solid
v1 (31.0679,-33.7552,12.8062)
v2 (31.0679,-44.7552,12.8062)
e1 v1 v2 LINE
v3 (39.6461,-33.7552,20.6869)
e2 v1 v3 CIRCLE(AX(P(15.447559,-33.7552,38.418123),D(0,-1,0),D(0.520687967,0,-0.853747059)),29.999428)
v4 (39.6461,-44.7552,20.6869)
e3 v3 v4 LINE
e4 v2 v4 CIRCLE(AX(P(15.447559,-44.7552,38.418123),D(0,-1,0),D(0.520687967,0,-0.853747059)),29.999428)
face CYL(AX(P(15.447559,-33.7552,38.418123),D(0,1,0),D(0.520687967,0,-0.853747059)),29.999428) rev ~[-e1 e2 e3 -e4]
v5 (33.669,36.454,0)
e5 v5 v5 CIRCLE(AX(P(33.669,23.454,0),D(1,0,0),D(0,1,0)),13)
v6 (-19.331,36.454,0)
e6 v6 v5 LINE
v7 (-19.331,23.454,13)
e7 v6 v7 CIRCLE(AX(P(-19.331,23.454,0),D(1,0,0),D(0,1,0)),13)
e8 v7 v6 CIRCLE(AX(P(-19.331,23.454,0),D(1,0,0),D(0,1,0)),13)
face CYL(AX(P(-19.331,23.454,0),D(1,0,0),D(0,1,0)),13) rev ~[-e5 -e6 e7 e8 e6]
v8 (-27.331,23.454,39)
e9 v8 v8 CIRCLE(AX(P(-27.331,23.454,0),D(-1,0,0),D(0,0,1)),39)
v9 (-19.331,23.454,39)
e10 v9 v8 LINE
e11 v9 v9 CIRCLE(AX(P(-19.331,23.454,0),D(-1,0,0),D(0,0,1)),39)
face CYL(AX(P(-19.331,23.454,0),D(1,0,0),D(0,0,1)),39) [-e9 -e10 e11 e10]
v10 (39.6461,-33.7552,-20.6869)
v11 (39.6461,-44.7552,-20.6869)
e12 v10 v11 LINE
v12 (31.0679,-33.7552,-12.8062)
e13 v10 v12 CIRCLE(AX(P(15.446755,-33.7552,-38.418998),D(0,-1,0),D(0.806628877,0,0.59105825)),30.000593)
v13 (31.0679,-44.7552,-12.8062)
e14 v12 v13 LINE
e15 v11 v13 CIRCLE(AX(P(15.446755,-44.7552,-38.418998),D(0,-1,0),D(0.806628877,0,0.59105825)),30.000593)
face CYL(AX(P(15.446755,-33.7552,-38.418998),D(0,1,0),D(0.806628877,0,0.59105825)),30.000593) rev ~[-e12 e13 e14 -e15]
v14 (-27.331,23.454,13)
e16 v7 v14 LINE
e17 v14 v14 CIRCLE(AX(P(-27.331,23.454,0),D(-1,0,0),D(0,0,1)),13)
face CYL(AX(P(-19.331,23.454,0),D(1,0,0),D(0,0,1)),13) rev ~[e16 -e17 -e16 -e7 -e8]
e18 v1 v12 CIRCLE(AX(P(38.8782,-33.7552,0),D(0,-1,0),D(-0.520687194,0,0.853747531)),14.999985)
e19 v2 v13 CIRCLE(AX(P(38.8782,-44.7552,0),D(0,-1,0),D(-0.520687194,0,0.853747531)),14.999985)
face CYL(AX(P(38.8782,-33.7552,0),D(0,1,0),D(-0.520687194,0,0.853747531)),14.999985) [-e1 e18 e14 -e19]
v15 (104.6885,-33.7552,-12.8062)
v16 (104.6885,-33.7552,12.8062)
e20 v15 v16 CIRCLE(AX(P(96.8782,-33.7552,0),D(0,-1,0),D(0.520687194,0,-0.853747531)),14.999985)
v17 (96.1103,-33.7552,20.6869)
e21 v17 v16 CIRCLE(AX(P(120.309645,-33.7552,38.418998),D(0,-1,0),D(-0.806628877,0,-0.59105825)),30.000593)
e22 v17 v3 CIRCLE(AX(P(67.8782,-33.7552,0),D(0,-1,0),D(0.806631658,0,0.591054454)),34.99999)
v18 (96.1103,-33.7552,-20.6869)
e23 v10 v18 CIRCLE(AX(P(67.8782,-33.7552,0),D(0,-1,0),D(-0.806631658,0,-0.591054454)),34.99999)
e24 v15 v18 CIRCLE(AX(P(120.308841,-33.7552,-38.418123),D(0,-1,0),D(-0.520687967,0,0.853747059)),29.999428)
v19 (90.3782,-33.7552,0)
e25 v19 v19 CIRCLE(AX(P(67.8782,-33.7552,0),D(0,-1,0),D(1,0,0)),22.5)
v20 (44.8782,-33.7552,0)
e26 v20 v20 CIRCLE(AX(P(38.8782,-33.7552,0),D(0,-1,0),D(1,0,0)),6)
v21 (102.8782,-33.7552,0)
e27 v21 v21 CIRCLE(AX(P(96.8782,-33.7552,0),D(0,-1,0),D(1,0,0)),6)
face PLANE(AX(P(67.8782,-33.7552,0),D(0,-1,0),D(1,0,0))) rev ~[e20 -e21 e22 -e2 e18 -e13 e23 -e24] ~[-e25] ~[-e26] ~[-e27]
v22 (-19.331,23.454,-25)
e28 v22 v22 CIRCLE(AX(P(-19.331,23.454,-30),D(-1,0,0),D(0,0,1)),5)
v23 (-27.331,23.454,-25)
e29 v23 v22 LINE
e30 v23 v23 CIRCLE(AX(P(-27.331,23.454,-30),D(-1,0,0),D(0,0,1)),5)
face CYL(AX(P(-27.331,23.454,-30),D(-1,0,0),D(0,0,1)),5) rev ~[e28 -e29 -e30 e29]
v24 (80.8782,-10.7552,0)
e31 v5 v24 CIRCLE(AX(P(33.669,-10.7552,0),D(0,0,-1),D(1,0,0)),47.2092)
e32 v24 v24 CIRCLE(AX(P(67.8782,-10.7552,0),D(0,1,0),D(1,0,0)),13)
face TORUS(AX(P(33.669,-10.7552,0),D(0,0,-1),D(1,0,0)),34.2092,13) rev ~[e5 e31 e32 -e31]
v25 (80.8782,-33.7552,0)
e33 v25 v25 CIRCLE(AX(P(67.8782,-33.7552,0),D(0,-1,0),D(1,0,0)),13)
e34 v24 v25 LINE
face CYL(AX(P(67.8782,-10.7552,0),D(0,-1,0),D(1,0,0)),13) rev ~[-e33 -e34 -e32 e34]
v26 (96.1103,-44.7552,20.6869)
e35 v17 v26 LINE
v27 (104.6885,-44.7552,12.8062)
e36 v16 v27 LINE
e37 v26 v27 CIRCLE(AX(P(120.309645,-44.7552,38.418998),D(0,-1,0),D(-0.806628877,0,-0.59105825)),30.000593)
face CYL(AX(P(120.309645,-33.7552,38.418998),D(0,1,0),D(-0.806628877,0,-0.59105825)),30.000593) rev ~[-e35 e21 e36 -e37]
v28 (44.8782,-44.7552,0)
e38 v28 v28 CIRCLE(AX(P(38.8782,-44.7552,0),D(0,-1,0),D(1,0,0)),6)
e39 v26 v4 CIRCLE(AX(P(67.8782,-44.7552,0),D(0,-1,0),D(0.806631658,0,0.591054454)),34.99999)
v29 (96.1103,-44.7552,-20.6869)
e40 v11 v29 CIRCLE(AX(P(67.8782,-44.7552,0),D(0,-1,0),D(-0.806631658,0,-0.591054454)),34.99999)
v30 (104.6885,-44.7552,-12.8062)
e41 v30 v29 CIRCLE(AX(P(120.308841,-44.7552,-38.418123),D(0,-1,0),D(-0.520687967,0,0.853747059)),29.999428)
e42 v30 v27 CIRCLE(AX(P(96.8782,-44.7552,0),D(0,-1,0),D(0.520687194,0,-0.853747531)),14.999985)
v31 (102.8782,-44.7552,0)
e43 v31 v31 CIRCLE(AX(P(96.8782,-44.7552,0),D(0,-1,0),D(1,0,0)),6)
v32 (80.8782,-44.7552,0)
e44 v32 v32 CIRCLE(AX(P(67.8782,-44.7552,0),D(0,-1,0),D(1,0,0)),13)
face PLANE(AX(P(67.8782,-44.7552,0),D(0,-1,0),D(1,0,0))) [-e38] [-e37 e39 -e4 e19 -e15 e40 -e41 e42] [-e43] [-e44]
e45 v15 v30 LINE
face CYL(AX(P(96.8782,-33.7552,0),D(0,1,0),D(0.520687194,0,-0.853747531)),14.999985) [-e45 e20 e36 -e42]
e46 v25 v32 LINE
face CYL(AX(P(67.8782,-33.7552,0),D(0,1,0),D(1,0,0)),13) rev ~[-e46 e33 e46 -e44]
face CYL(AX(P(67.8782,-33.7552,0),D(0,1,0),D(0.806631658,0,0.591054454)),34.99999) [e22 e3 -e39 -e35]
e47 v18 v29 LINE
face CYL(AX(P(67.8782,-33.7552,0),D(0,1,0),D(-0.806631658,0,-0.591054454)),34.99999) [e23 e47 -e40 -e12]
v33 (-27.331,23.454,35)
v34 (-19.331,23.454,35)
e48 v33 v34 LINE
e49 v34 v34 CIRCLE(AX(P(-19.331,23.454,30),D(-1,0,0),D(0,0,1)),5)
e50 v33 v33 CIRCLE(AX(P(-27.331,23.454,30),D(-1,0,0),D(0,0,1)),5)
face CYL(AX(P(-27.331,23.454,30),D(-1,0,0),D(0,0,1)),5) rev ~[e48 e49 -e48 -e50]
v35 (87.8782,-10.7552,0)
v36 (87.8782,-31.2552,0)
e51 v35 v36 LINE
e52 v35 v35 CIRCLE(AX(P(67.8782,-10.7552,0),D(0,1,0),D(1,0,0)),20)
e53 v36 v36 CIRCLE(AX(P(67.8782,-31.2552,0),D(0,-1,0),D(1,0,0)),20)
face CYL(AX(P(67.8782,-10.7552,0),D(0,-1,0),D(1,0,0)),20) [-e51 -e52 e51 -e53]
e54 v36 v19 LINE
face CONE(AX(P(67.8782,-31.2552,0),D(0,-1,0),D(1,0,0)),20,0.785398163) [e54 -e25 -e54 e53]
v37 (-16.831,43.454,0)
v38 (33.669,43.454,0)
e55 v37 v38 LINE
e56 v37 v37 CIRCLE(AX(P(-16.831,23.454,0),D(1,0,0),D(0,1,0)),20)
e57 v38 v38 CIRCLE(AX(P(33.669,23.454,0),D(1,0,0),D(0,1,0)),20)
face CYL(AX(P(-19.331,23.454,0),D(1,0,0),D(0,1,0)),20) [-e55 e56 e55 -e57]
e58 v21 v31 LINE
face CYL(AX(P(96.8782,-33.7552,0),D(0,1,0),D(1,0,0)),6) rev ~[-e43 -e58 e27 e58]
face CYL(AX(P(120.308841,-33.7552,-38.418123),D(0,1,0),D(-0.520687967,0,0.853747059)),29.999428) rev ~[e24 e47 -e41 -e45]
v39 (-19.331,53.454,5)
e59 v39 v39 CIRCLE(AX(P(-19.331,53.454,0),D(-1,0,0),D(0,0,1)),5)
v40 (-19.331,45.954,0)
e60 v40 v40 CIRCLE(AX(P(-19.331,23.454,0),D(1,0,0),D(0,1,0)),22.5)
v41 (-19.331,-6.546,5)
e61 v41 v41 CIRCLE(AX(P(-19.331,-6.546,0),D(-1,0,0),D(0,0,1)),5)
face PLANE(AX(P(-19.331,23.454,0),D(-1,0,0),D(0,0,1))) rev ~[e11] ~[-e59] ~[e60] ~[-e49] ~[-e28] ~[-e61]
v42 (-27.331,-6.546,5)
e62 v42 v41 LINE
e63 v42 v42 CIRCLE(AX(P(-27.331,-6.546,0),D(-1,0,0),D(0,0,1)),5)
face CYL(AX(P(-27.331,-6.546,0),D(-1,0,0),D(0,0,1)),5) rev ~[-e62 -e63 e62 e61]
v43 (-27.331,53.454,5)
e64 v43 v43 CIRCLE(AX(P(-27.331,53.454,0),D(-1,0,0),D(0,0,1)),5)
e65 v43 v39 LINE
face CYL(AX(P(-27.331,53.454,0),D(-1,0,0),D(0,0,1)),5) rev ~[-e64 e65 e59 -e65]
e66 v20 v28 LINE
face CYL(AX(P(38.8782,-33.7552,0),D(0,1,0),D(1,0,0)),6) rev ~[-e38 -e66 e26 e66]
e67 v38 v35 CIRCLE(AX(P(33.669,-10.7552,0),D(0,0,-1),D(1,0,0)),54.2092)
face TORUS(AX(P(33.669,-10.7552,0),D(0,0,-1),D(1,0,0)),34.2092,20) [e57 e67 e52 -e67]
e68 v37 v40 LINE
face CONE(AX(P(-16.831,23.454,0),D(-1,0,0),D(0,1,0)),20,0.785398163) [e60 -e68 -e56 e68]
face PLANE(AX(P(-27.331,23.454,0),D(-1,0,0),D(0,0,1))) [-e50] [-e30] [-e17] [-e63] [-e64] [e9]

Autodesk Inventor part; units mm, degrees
ref_plane "XZ Plane" through (0, 0, 0) normal (0, 1, 0) x (-1, 0, 0)
ref_plane "XY Plane" through (0, 0, 0) normal (0, 0, 1) x (1, 0, 0)
sketch "Sketch1" plane through (0, 0, 0) normal (0, 0, 1) x (1, 0, 0)
  line L0 (-244.3747, 73.9364) -> (-91.8552, 73.9364) construction
  line L1 (-91.8552, 73.9364) -> (-91.8552, -48.2612) construction
  line L2 (-91.8552, -48.2612) -> (-244.3747, -48.2612) construction
  line L3 (-244.3747, -48.2612) -> (-244.3747, 73.9364) construction
  line L4 (-19.331, 24.2448) -> (33.669, 24.2448)
  line L5 (68.669, -10.7552) -> (68.669, -33.7552)
  arc A0 (68.669, -10.7552) -> (33.669, 24.2448) centre (33.669, -10.7552) ccw
  point P0 (0, 0)
  dimension "d13" = 58
  dimension "d15" = 35
ref_plane "Work Plane1" through (-19.05, 0, 0) normal (1, 0, 0) x (0, 1, 0)
sketch "Sketch2" plane through (-19.05, 0, 0) normal (1, 0, 0) x (0, 1, 0)
  point P0 (0, 0)
sketch "Sketch3" plane through (-19.05, 0, 0) normal (1, 0, 0) x (0, 1, 0)
  circle A0 centre (23.454, 0) radius 20
  point P0 (0, 0)
  dimension "d16" = 40
sweep "Sweep1" add profiles "Sketch3" path "Sketch1"
shell "Shell1" thickness 7 removed faces 2 at (-19.331, 19.2276, 1.3227) at (61.9752, -33.7552, -3.0982)
sketch "Sketch4" plane through (-19.331, 23.454, 0) normal (-1, 0, 0) x (0, 0, 1)
  point P0 (0, -23.454)
sketch "Sketch5" plane through (-19.331, 23.454, 0) normal (-1, 0, 0) x (0, 0, 1)
  point P0 (0, -23.454)
sketch "Sketch6" plane through (-19.331, 23.454, 0) normal (-1, 0, 0) x (0, 0, 1)
  point P0 (0, -23.454)
sketch "Sketch7" plane through (-19.331, 23.454, 0) normal (-1, 0, 0) x (0, 0, 1)
  point P0 (0, -23.454)
sketch "Sketch8" plane through (-19.331, 23.454, 0) normal (-1, 0, 0) x (0, 0, 1)
  point P0 (0, -23.454)
sketch "Sketch9" plane through (-19.331, 23.454, 0) normal (-1, 0, 0) x (0, 0, 1)
  point P0 (0, -23.454)
sketch "Sketch10" plane through (-19.331, 23.454, 0) normal (-1, 0, 0) x (0, 0, 1)
  point P0 (0, -23.454)
sketch "Sketch11" plane through (-19.331, 23.454, 0) normal (-1, 0, 0) x (0, 0, 1)
  point P0 (0, -23.454)
sketch "Sketch12" plane through (-19.331, 23.454, 0) normal (-1, 0, 0) x (0, 0, 1)
  point P0 (0, -23.454)
sketch "Sketch13" plane through (-19.331, 23.454, 0) normal (-1, 0, 0) x (0, 0, 1)
  point P0 (0, -23.454)
sketch "Sketch14" plane through (-19.331, 23.454, 0) normal (-1, 0, 0) x (0, 0, 1)
  point P0 (0, -23.454)
sketch "Sketch15" plane through (-19.331, 23.454, 0) normal (-1, 0, 0) x (0, 0, 1)
  point P0 (0, -23.454)
sketch "Sketch16" plane through (-19.331, 23.454, 0) normal (-1, 0, 0) x (0, 0, 1)
  circle A0 centre (0, 0) radius 39
  circle A1 centre (0, 0) radius 13
  point P0 (0, -23.454)
  dimension "d20" = 78
  dimension "d21" = 26
extrude "Extrusion1" add sketch "Sketch16" along normal blind 8
sketch "Sketch17" plane through (-27.331, 23.454, 0) normal (-1, 0, 0) x (0, 0, 1)
  circle A0 centre (0, 30) radius 5
  circle A1 centre (0, 0) radius 13 projected
  circle A2 centre (-30, 0) radius 5
  circle A3 centre (0, -30) radius 5
  circle A4 centre (30, 0) radius 5
  point P0 (0, -23.454)
  dimension "d24" = 10
  dimension "d25" = 30
  dimension "d28" = 360
extrude "Extrusion2" cut sketch "Sketch17" against normal blind 8 contours A0 | A2 | A3 | A4
chamfer "Chamfer1" distance 2.5 angle 45 1 edges at (-19.331, 3.454, 0)
sketch "Sketch18" plane through (67.8782, -33.7552, 0) normal (0, -1, 0) x (1, 0, 0)
  circle A0 centre (0, 0) radius 13 projected
  circle A1 centre (0, 0) radius 13
  circle A2 centre (29, 0) radius 6
  arc A3 (36.8103, -12.8062) -> (36.8103, 12.8062) centre (29, 0) ccw
  arc A4 (28.2321, 20.6869) -> (36.8103, 12.8062) centre (52.431, 38.4186) ccw
  arc A5 (36.8103, -12.8062) -> (28.2321, -20.6869) centre (52.431, -38.4186) ccw
  circle A6 centre (-29, 0) radius 6
  arc A7 (-36.8103, 12.8062) -> (-36.8103, -12.8062) centre (-29, 0) ccw
  arc A8 (-36.8103, 12.8062) -> (-28.2321, 20.6869) centre (-52.431, 38.4186) ccw
  arc A9 (-28.2321, -20.6869) -> (-36.8103, -12.8062) centre (-52.431, -38.4186) ccw
  arc A10 (28.2321, 20.6869) -> (-28.2321, 20.6869) centre (0, 0) ccw
  arc A11 (-28.2321, -20.6869) -> (28.2321, -20.6869) centre (0, 0) ccw
  point P0 (-67.8782, 0)
  dimension "d36" = 26
  dimension "d38" = 12
  dimension "d39" = 29
  dimension "d41" = 30
  dimension "d42" = 29
extrude "Extrusion3" add sketch "Sketch18" along normal blind 11
chamfer "Chamfer2" distance 2.5 angle 45 1 edges at (47.8782, -33.7552, 0)
properties part number "cad@41"
